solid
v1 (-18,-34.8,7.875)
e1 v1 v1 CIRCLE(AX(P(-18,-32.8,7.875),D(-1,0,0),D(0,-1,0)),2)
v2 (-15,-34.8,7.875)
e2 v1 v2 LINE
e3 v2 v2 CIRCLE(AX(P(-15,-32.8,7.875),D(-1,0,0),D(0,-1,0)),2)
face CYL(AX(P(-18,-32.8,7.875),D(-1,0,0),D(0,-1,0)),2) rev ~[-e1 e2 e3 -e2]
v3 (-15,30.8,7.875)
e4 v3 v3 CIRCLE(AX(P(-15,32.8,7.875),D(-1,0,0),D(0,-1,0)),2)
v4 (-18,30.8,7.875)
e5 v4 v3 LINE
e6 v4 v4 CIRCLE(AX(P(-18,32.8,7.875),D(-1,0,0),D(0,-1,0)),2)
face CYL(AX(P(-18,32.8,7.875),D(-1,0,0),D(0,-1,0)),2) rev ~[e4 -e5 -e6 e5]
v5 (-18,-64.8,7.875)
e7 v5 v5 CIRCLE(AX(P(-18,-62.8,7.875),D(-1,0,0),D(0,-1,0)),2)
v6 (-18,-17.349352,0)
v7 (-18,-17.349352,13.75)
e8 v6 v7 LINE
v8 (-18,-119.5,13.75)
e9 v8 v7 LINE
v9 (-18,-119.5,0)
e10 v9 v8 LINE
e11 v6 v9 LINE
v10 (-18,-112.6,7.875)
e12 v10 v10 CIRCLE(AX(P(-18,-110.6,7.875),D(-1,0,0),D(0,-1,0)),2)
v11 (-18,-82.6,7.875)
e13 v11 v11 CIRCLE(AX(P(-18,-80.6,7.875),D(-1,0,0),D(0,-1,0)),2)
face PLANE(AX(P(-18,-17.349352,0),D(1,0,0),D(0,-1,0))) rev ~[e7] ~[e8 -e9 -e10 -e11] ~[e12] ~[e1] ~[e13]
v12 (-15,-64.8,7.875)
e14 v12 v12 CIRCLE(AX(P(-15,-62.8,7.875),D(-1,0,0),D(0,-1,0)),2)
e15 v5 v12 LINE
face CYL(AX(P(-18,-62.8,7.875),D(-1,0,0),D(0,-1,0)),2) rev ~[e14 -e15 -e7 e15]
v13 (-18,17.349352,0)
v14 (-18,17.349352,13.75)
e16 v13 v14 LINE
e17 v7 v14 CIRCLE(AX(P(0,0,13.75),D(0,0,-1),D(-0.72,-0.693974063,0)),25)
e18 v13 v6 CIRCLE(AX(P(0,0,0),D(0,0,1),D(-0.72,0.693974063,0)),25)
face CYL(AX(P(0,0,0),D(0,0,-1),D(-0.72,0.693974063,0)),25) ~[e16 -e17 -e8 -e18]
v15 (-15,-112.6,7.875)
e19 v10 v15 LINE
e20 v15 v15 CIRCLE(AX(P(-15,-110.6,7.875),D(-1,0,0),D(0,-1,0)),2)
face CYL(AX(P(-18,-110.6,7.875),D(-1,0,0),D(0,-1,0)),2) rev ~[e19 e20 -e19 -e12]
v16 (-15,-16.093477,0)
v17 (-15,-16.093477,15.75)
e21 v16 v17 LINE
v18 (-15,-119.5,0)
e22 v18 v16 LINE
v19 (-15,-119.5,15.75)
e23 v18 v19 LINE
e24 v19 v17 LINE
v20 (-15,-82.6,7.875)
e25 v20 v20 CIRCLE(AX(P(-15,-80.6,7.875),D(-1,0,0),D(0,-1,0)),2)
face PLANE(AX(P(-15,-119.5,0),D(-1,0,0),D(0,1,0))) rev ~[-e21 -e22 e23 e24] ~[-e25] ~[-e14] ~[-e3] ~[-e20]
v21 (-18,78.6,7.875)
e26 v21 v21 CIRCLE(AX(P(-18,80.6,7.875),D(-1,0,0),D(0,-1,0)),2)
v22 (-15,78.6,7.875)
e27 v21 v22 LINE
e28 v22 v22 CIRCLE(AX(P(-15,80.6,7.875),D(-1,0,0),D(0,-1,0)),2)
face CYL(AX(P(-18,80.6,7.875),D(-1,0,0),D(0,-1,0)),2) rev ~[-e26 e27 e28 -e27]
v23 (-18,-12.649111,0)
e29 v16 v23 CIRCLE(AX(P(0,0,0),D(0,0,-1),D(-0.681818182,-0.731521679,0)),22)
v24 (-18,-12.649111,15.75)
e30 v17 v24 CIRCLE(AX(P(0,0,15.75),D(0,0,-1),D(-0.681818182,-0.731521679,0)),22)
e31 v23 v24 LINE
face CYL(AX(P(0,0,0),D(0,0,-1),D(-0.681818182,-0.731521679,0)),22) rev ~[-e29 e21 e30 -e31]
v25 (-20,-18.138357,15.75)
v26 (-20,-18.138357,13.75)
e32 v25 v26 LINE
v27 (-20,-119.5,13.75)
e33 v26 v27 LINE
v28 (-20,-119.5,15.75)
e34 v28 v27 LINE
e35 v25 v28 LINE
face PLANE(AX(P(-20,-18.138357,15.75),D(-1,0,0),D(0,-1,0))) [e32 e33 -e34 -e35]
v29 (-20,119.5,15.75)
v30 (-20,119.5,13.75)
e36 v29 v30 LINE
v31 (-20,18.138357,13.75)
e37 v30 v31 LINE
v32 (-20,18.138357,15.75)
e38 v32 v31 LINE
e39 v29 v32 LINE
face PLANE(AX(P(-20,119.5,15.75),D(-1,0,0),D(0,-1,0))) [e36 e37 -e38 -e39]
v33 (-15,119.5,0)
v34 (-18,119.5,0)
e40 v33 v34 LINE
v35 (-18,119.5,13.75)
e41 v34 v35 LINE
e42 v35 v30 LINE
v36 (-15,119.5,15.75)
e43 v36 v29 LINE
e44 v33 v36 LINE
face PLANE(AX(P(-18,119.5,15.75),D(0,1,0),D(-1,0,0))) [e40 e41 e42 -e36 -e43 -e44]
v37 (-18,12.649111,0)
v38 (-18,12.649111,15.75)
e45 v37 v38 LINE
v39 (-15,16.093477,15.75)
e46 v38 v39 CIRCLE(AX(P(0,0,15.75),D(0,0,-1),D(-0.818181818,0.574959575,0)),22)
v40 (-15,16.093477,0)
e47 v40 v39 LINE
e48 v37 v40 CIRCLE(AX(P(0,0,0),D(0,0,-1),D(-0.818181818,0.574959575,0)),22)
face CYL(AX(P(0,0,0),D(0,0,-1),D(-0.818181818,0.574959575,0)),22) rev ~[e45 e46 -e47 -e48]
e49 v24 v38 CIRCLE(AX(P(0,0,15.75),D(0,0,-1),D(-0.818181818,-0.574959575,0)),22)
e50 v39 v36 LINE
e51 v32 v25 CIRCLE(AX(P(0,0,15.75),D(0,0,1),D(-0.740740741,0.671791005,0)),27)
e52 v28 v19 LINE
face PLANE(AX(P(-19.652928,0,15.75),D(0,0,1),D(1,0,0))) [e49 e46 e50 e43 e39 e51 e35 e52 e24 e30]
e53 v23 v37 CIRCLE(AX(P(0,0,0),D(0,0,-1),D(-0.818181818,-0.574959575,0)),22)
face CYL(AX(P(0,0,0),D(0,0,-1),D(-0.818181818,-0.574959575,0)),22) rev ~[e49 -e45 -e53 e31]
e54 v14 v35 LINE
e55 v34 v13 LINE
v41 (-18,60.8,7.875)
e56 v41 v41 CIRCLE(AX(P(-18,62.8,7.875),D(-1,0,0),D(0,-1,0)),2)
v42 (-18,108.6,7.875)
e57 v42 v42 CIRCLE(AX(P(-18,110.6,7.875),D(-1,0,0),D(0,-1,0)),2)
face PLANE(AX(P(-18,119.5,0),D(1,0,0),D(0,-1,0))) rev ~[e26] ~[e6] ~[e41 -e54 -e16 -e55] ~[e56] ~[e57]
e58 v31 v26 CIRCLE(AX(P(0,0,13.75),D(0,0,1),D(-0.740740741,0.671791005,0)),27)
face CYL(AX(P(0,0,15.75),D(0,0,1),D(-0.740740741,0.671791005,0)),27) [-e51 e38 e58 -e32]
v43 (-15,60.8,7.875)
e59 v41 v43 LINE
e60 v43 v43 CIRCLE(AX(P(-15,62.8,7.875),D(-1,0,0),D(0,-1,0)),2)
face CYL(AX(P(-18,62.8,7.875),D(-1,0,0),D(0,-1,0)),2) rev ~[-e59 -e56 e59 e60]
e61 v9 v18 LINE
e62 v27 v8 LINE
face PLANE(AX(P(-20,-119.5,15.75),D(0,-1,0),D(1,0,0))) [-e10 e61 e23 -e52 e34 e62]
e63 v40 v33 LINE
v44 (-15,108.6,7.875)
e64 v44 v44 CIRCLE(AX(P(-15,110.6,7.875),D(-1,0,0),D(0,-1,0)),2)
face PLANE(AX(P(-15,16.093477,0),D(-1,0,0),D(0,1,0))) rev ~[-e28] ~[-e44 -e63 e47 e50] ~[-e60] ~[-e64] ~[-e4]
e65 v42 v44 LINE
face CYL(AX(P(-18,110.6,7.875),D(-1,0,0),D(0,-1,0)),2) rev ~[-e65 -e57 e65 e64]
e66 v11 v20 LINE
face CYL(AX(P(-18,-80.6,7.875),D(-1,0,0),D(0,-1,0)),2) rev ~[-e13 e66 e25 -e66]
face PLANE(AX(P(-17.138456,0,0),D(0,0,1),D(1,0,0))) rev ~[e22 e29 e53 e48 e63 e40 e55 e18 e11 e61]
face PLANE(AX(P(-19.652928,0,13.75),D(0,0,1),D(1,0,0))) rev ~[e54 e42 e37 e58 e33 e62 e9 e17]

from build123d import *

# Parameters (mm, degrees)
F1_DEPTH = 15.75
F2_R     = 2
F4_DEPTH = 3.001
F3_R     = 2
F5_DEPTH = 3.001
F7_DEPTH = 2


# Not quite as in the source:
# - a feature names something its author has since deleted; it is built from what else it names


with BuildPart() as f1:
    # F0 (on Top) → F1 (new body)
    with BuildSketch(Plane.XY):
        with BuildLine():
            Line((-15, 119.5), (-18, 119.5))
            Line((-18, 119.5), (-18, 17.3493515729))
            ThreePointArc((-18, 17.3493515729), (-25, 0), (-18, -17.3493515729))
            Line((-18, -17.3493515729), (-18, -119.5))
            Line((-18, -119.5), (-15, -119.5))
            Line((-15, -119.5), (-15, -16.0934769394))
            ThreePointArc((-15, -16.0934769394), (-16.5896327506, -14.4493627956), (-18, -12.6491106407))
            ThreePointArc((-18, -12.6491106407), (-22, 0), (-18, 12.6491106407))
            ThreePointArc((-18, 12.6491106407), (-16.5896327506, 14.4493627956), (-15, 16.0934769394))
            Line((-15, 16.0934769394), (-15, 119.5))
        make_face()
    extrude(amount=F1_DEPTH)

    # F2 (on face) → F4 (cut, through all)
    with BuildSketch(Plane(origin=(-18, 0, 0), x_dir=(0, -1, 0), z_dir=(-1, 0, 0))):
        with Locations((-110.6, 7.875)):
            Circle(F2_R)
        with Locations((-80.6, 7.875)):
            Circle(F2_R)
        with Locations((-62.8, 7.875)):
            Circle(F2_R)
        with Locations((-32.8, 7.875)):
            Circle(F2_R)
    extrude(amount=-F4_DEPTH, mode=Mode.SUBTRACT)

    # F3 (on face) → F5 (cut, through all)
    with BuildSketch(Plane(origin=(-18, 0, 0), x_dir=(0, -1, 0), z_dir=(-1, 0, 0))):
        with Locations((32.8, 7.875)):
            Circle(F3_R)
        with Locations((62.8, 7.875)):
            Circle(F3_R)
        with Locations((80.6, 7.875)):
            Circle(F3_R)
        with Locations((110.6, 7.875)):
            Circle(F3_R)
    extrude(amount=-F5_DEPTH, mode=Mode.SUBTRACT)

    # F6 (on face) → F7 (join)
    with BuildSketch(Plane.XY.offset(15.75)):
        with BuildLine():
            ThreePointArc((-20, 18.1383571472), (-27, 0), (-20, -18.1383571472))
            Line((-20, -18.1383571472), (-20, -119.5))
            Line((-20, -119.5), (-18, -119.5))
            Line((-18, -119.5), (-18, -17.3493515729))
            ThreePointArc((-18, -17.3493515729), (-25, 0), (-18, 17.3493515729))
            Line((-18, 17.3493515729), (-18, 119.5))
            Line((-18, 119.5), (-20, 119.5))
            Line((-20, 119.5), (-20, 18.1383571472))
        make_face()
    extrude(amount=-F7_DEPTH)


solid = f1.part
